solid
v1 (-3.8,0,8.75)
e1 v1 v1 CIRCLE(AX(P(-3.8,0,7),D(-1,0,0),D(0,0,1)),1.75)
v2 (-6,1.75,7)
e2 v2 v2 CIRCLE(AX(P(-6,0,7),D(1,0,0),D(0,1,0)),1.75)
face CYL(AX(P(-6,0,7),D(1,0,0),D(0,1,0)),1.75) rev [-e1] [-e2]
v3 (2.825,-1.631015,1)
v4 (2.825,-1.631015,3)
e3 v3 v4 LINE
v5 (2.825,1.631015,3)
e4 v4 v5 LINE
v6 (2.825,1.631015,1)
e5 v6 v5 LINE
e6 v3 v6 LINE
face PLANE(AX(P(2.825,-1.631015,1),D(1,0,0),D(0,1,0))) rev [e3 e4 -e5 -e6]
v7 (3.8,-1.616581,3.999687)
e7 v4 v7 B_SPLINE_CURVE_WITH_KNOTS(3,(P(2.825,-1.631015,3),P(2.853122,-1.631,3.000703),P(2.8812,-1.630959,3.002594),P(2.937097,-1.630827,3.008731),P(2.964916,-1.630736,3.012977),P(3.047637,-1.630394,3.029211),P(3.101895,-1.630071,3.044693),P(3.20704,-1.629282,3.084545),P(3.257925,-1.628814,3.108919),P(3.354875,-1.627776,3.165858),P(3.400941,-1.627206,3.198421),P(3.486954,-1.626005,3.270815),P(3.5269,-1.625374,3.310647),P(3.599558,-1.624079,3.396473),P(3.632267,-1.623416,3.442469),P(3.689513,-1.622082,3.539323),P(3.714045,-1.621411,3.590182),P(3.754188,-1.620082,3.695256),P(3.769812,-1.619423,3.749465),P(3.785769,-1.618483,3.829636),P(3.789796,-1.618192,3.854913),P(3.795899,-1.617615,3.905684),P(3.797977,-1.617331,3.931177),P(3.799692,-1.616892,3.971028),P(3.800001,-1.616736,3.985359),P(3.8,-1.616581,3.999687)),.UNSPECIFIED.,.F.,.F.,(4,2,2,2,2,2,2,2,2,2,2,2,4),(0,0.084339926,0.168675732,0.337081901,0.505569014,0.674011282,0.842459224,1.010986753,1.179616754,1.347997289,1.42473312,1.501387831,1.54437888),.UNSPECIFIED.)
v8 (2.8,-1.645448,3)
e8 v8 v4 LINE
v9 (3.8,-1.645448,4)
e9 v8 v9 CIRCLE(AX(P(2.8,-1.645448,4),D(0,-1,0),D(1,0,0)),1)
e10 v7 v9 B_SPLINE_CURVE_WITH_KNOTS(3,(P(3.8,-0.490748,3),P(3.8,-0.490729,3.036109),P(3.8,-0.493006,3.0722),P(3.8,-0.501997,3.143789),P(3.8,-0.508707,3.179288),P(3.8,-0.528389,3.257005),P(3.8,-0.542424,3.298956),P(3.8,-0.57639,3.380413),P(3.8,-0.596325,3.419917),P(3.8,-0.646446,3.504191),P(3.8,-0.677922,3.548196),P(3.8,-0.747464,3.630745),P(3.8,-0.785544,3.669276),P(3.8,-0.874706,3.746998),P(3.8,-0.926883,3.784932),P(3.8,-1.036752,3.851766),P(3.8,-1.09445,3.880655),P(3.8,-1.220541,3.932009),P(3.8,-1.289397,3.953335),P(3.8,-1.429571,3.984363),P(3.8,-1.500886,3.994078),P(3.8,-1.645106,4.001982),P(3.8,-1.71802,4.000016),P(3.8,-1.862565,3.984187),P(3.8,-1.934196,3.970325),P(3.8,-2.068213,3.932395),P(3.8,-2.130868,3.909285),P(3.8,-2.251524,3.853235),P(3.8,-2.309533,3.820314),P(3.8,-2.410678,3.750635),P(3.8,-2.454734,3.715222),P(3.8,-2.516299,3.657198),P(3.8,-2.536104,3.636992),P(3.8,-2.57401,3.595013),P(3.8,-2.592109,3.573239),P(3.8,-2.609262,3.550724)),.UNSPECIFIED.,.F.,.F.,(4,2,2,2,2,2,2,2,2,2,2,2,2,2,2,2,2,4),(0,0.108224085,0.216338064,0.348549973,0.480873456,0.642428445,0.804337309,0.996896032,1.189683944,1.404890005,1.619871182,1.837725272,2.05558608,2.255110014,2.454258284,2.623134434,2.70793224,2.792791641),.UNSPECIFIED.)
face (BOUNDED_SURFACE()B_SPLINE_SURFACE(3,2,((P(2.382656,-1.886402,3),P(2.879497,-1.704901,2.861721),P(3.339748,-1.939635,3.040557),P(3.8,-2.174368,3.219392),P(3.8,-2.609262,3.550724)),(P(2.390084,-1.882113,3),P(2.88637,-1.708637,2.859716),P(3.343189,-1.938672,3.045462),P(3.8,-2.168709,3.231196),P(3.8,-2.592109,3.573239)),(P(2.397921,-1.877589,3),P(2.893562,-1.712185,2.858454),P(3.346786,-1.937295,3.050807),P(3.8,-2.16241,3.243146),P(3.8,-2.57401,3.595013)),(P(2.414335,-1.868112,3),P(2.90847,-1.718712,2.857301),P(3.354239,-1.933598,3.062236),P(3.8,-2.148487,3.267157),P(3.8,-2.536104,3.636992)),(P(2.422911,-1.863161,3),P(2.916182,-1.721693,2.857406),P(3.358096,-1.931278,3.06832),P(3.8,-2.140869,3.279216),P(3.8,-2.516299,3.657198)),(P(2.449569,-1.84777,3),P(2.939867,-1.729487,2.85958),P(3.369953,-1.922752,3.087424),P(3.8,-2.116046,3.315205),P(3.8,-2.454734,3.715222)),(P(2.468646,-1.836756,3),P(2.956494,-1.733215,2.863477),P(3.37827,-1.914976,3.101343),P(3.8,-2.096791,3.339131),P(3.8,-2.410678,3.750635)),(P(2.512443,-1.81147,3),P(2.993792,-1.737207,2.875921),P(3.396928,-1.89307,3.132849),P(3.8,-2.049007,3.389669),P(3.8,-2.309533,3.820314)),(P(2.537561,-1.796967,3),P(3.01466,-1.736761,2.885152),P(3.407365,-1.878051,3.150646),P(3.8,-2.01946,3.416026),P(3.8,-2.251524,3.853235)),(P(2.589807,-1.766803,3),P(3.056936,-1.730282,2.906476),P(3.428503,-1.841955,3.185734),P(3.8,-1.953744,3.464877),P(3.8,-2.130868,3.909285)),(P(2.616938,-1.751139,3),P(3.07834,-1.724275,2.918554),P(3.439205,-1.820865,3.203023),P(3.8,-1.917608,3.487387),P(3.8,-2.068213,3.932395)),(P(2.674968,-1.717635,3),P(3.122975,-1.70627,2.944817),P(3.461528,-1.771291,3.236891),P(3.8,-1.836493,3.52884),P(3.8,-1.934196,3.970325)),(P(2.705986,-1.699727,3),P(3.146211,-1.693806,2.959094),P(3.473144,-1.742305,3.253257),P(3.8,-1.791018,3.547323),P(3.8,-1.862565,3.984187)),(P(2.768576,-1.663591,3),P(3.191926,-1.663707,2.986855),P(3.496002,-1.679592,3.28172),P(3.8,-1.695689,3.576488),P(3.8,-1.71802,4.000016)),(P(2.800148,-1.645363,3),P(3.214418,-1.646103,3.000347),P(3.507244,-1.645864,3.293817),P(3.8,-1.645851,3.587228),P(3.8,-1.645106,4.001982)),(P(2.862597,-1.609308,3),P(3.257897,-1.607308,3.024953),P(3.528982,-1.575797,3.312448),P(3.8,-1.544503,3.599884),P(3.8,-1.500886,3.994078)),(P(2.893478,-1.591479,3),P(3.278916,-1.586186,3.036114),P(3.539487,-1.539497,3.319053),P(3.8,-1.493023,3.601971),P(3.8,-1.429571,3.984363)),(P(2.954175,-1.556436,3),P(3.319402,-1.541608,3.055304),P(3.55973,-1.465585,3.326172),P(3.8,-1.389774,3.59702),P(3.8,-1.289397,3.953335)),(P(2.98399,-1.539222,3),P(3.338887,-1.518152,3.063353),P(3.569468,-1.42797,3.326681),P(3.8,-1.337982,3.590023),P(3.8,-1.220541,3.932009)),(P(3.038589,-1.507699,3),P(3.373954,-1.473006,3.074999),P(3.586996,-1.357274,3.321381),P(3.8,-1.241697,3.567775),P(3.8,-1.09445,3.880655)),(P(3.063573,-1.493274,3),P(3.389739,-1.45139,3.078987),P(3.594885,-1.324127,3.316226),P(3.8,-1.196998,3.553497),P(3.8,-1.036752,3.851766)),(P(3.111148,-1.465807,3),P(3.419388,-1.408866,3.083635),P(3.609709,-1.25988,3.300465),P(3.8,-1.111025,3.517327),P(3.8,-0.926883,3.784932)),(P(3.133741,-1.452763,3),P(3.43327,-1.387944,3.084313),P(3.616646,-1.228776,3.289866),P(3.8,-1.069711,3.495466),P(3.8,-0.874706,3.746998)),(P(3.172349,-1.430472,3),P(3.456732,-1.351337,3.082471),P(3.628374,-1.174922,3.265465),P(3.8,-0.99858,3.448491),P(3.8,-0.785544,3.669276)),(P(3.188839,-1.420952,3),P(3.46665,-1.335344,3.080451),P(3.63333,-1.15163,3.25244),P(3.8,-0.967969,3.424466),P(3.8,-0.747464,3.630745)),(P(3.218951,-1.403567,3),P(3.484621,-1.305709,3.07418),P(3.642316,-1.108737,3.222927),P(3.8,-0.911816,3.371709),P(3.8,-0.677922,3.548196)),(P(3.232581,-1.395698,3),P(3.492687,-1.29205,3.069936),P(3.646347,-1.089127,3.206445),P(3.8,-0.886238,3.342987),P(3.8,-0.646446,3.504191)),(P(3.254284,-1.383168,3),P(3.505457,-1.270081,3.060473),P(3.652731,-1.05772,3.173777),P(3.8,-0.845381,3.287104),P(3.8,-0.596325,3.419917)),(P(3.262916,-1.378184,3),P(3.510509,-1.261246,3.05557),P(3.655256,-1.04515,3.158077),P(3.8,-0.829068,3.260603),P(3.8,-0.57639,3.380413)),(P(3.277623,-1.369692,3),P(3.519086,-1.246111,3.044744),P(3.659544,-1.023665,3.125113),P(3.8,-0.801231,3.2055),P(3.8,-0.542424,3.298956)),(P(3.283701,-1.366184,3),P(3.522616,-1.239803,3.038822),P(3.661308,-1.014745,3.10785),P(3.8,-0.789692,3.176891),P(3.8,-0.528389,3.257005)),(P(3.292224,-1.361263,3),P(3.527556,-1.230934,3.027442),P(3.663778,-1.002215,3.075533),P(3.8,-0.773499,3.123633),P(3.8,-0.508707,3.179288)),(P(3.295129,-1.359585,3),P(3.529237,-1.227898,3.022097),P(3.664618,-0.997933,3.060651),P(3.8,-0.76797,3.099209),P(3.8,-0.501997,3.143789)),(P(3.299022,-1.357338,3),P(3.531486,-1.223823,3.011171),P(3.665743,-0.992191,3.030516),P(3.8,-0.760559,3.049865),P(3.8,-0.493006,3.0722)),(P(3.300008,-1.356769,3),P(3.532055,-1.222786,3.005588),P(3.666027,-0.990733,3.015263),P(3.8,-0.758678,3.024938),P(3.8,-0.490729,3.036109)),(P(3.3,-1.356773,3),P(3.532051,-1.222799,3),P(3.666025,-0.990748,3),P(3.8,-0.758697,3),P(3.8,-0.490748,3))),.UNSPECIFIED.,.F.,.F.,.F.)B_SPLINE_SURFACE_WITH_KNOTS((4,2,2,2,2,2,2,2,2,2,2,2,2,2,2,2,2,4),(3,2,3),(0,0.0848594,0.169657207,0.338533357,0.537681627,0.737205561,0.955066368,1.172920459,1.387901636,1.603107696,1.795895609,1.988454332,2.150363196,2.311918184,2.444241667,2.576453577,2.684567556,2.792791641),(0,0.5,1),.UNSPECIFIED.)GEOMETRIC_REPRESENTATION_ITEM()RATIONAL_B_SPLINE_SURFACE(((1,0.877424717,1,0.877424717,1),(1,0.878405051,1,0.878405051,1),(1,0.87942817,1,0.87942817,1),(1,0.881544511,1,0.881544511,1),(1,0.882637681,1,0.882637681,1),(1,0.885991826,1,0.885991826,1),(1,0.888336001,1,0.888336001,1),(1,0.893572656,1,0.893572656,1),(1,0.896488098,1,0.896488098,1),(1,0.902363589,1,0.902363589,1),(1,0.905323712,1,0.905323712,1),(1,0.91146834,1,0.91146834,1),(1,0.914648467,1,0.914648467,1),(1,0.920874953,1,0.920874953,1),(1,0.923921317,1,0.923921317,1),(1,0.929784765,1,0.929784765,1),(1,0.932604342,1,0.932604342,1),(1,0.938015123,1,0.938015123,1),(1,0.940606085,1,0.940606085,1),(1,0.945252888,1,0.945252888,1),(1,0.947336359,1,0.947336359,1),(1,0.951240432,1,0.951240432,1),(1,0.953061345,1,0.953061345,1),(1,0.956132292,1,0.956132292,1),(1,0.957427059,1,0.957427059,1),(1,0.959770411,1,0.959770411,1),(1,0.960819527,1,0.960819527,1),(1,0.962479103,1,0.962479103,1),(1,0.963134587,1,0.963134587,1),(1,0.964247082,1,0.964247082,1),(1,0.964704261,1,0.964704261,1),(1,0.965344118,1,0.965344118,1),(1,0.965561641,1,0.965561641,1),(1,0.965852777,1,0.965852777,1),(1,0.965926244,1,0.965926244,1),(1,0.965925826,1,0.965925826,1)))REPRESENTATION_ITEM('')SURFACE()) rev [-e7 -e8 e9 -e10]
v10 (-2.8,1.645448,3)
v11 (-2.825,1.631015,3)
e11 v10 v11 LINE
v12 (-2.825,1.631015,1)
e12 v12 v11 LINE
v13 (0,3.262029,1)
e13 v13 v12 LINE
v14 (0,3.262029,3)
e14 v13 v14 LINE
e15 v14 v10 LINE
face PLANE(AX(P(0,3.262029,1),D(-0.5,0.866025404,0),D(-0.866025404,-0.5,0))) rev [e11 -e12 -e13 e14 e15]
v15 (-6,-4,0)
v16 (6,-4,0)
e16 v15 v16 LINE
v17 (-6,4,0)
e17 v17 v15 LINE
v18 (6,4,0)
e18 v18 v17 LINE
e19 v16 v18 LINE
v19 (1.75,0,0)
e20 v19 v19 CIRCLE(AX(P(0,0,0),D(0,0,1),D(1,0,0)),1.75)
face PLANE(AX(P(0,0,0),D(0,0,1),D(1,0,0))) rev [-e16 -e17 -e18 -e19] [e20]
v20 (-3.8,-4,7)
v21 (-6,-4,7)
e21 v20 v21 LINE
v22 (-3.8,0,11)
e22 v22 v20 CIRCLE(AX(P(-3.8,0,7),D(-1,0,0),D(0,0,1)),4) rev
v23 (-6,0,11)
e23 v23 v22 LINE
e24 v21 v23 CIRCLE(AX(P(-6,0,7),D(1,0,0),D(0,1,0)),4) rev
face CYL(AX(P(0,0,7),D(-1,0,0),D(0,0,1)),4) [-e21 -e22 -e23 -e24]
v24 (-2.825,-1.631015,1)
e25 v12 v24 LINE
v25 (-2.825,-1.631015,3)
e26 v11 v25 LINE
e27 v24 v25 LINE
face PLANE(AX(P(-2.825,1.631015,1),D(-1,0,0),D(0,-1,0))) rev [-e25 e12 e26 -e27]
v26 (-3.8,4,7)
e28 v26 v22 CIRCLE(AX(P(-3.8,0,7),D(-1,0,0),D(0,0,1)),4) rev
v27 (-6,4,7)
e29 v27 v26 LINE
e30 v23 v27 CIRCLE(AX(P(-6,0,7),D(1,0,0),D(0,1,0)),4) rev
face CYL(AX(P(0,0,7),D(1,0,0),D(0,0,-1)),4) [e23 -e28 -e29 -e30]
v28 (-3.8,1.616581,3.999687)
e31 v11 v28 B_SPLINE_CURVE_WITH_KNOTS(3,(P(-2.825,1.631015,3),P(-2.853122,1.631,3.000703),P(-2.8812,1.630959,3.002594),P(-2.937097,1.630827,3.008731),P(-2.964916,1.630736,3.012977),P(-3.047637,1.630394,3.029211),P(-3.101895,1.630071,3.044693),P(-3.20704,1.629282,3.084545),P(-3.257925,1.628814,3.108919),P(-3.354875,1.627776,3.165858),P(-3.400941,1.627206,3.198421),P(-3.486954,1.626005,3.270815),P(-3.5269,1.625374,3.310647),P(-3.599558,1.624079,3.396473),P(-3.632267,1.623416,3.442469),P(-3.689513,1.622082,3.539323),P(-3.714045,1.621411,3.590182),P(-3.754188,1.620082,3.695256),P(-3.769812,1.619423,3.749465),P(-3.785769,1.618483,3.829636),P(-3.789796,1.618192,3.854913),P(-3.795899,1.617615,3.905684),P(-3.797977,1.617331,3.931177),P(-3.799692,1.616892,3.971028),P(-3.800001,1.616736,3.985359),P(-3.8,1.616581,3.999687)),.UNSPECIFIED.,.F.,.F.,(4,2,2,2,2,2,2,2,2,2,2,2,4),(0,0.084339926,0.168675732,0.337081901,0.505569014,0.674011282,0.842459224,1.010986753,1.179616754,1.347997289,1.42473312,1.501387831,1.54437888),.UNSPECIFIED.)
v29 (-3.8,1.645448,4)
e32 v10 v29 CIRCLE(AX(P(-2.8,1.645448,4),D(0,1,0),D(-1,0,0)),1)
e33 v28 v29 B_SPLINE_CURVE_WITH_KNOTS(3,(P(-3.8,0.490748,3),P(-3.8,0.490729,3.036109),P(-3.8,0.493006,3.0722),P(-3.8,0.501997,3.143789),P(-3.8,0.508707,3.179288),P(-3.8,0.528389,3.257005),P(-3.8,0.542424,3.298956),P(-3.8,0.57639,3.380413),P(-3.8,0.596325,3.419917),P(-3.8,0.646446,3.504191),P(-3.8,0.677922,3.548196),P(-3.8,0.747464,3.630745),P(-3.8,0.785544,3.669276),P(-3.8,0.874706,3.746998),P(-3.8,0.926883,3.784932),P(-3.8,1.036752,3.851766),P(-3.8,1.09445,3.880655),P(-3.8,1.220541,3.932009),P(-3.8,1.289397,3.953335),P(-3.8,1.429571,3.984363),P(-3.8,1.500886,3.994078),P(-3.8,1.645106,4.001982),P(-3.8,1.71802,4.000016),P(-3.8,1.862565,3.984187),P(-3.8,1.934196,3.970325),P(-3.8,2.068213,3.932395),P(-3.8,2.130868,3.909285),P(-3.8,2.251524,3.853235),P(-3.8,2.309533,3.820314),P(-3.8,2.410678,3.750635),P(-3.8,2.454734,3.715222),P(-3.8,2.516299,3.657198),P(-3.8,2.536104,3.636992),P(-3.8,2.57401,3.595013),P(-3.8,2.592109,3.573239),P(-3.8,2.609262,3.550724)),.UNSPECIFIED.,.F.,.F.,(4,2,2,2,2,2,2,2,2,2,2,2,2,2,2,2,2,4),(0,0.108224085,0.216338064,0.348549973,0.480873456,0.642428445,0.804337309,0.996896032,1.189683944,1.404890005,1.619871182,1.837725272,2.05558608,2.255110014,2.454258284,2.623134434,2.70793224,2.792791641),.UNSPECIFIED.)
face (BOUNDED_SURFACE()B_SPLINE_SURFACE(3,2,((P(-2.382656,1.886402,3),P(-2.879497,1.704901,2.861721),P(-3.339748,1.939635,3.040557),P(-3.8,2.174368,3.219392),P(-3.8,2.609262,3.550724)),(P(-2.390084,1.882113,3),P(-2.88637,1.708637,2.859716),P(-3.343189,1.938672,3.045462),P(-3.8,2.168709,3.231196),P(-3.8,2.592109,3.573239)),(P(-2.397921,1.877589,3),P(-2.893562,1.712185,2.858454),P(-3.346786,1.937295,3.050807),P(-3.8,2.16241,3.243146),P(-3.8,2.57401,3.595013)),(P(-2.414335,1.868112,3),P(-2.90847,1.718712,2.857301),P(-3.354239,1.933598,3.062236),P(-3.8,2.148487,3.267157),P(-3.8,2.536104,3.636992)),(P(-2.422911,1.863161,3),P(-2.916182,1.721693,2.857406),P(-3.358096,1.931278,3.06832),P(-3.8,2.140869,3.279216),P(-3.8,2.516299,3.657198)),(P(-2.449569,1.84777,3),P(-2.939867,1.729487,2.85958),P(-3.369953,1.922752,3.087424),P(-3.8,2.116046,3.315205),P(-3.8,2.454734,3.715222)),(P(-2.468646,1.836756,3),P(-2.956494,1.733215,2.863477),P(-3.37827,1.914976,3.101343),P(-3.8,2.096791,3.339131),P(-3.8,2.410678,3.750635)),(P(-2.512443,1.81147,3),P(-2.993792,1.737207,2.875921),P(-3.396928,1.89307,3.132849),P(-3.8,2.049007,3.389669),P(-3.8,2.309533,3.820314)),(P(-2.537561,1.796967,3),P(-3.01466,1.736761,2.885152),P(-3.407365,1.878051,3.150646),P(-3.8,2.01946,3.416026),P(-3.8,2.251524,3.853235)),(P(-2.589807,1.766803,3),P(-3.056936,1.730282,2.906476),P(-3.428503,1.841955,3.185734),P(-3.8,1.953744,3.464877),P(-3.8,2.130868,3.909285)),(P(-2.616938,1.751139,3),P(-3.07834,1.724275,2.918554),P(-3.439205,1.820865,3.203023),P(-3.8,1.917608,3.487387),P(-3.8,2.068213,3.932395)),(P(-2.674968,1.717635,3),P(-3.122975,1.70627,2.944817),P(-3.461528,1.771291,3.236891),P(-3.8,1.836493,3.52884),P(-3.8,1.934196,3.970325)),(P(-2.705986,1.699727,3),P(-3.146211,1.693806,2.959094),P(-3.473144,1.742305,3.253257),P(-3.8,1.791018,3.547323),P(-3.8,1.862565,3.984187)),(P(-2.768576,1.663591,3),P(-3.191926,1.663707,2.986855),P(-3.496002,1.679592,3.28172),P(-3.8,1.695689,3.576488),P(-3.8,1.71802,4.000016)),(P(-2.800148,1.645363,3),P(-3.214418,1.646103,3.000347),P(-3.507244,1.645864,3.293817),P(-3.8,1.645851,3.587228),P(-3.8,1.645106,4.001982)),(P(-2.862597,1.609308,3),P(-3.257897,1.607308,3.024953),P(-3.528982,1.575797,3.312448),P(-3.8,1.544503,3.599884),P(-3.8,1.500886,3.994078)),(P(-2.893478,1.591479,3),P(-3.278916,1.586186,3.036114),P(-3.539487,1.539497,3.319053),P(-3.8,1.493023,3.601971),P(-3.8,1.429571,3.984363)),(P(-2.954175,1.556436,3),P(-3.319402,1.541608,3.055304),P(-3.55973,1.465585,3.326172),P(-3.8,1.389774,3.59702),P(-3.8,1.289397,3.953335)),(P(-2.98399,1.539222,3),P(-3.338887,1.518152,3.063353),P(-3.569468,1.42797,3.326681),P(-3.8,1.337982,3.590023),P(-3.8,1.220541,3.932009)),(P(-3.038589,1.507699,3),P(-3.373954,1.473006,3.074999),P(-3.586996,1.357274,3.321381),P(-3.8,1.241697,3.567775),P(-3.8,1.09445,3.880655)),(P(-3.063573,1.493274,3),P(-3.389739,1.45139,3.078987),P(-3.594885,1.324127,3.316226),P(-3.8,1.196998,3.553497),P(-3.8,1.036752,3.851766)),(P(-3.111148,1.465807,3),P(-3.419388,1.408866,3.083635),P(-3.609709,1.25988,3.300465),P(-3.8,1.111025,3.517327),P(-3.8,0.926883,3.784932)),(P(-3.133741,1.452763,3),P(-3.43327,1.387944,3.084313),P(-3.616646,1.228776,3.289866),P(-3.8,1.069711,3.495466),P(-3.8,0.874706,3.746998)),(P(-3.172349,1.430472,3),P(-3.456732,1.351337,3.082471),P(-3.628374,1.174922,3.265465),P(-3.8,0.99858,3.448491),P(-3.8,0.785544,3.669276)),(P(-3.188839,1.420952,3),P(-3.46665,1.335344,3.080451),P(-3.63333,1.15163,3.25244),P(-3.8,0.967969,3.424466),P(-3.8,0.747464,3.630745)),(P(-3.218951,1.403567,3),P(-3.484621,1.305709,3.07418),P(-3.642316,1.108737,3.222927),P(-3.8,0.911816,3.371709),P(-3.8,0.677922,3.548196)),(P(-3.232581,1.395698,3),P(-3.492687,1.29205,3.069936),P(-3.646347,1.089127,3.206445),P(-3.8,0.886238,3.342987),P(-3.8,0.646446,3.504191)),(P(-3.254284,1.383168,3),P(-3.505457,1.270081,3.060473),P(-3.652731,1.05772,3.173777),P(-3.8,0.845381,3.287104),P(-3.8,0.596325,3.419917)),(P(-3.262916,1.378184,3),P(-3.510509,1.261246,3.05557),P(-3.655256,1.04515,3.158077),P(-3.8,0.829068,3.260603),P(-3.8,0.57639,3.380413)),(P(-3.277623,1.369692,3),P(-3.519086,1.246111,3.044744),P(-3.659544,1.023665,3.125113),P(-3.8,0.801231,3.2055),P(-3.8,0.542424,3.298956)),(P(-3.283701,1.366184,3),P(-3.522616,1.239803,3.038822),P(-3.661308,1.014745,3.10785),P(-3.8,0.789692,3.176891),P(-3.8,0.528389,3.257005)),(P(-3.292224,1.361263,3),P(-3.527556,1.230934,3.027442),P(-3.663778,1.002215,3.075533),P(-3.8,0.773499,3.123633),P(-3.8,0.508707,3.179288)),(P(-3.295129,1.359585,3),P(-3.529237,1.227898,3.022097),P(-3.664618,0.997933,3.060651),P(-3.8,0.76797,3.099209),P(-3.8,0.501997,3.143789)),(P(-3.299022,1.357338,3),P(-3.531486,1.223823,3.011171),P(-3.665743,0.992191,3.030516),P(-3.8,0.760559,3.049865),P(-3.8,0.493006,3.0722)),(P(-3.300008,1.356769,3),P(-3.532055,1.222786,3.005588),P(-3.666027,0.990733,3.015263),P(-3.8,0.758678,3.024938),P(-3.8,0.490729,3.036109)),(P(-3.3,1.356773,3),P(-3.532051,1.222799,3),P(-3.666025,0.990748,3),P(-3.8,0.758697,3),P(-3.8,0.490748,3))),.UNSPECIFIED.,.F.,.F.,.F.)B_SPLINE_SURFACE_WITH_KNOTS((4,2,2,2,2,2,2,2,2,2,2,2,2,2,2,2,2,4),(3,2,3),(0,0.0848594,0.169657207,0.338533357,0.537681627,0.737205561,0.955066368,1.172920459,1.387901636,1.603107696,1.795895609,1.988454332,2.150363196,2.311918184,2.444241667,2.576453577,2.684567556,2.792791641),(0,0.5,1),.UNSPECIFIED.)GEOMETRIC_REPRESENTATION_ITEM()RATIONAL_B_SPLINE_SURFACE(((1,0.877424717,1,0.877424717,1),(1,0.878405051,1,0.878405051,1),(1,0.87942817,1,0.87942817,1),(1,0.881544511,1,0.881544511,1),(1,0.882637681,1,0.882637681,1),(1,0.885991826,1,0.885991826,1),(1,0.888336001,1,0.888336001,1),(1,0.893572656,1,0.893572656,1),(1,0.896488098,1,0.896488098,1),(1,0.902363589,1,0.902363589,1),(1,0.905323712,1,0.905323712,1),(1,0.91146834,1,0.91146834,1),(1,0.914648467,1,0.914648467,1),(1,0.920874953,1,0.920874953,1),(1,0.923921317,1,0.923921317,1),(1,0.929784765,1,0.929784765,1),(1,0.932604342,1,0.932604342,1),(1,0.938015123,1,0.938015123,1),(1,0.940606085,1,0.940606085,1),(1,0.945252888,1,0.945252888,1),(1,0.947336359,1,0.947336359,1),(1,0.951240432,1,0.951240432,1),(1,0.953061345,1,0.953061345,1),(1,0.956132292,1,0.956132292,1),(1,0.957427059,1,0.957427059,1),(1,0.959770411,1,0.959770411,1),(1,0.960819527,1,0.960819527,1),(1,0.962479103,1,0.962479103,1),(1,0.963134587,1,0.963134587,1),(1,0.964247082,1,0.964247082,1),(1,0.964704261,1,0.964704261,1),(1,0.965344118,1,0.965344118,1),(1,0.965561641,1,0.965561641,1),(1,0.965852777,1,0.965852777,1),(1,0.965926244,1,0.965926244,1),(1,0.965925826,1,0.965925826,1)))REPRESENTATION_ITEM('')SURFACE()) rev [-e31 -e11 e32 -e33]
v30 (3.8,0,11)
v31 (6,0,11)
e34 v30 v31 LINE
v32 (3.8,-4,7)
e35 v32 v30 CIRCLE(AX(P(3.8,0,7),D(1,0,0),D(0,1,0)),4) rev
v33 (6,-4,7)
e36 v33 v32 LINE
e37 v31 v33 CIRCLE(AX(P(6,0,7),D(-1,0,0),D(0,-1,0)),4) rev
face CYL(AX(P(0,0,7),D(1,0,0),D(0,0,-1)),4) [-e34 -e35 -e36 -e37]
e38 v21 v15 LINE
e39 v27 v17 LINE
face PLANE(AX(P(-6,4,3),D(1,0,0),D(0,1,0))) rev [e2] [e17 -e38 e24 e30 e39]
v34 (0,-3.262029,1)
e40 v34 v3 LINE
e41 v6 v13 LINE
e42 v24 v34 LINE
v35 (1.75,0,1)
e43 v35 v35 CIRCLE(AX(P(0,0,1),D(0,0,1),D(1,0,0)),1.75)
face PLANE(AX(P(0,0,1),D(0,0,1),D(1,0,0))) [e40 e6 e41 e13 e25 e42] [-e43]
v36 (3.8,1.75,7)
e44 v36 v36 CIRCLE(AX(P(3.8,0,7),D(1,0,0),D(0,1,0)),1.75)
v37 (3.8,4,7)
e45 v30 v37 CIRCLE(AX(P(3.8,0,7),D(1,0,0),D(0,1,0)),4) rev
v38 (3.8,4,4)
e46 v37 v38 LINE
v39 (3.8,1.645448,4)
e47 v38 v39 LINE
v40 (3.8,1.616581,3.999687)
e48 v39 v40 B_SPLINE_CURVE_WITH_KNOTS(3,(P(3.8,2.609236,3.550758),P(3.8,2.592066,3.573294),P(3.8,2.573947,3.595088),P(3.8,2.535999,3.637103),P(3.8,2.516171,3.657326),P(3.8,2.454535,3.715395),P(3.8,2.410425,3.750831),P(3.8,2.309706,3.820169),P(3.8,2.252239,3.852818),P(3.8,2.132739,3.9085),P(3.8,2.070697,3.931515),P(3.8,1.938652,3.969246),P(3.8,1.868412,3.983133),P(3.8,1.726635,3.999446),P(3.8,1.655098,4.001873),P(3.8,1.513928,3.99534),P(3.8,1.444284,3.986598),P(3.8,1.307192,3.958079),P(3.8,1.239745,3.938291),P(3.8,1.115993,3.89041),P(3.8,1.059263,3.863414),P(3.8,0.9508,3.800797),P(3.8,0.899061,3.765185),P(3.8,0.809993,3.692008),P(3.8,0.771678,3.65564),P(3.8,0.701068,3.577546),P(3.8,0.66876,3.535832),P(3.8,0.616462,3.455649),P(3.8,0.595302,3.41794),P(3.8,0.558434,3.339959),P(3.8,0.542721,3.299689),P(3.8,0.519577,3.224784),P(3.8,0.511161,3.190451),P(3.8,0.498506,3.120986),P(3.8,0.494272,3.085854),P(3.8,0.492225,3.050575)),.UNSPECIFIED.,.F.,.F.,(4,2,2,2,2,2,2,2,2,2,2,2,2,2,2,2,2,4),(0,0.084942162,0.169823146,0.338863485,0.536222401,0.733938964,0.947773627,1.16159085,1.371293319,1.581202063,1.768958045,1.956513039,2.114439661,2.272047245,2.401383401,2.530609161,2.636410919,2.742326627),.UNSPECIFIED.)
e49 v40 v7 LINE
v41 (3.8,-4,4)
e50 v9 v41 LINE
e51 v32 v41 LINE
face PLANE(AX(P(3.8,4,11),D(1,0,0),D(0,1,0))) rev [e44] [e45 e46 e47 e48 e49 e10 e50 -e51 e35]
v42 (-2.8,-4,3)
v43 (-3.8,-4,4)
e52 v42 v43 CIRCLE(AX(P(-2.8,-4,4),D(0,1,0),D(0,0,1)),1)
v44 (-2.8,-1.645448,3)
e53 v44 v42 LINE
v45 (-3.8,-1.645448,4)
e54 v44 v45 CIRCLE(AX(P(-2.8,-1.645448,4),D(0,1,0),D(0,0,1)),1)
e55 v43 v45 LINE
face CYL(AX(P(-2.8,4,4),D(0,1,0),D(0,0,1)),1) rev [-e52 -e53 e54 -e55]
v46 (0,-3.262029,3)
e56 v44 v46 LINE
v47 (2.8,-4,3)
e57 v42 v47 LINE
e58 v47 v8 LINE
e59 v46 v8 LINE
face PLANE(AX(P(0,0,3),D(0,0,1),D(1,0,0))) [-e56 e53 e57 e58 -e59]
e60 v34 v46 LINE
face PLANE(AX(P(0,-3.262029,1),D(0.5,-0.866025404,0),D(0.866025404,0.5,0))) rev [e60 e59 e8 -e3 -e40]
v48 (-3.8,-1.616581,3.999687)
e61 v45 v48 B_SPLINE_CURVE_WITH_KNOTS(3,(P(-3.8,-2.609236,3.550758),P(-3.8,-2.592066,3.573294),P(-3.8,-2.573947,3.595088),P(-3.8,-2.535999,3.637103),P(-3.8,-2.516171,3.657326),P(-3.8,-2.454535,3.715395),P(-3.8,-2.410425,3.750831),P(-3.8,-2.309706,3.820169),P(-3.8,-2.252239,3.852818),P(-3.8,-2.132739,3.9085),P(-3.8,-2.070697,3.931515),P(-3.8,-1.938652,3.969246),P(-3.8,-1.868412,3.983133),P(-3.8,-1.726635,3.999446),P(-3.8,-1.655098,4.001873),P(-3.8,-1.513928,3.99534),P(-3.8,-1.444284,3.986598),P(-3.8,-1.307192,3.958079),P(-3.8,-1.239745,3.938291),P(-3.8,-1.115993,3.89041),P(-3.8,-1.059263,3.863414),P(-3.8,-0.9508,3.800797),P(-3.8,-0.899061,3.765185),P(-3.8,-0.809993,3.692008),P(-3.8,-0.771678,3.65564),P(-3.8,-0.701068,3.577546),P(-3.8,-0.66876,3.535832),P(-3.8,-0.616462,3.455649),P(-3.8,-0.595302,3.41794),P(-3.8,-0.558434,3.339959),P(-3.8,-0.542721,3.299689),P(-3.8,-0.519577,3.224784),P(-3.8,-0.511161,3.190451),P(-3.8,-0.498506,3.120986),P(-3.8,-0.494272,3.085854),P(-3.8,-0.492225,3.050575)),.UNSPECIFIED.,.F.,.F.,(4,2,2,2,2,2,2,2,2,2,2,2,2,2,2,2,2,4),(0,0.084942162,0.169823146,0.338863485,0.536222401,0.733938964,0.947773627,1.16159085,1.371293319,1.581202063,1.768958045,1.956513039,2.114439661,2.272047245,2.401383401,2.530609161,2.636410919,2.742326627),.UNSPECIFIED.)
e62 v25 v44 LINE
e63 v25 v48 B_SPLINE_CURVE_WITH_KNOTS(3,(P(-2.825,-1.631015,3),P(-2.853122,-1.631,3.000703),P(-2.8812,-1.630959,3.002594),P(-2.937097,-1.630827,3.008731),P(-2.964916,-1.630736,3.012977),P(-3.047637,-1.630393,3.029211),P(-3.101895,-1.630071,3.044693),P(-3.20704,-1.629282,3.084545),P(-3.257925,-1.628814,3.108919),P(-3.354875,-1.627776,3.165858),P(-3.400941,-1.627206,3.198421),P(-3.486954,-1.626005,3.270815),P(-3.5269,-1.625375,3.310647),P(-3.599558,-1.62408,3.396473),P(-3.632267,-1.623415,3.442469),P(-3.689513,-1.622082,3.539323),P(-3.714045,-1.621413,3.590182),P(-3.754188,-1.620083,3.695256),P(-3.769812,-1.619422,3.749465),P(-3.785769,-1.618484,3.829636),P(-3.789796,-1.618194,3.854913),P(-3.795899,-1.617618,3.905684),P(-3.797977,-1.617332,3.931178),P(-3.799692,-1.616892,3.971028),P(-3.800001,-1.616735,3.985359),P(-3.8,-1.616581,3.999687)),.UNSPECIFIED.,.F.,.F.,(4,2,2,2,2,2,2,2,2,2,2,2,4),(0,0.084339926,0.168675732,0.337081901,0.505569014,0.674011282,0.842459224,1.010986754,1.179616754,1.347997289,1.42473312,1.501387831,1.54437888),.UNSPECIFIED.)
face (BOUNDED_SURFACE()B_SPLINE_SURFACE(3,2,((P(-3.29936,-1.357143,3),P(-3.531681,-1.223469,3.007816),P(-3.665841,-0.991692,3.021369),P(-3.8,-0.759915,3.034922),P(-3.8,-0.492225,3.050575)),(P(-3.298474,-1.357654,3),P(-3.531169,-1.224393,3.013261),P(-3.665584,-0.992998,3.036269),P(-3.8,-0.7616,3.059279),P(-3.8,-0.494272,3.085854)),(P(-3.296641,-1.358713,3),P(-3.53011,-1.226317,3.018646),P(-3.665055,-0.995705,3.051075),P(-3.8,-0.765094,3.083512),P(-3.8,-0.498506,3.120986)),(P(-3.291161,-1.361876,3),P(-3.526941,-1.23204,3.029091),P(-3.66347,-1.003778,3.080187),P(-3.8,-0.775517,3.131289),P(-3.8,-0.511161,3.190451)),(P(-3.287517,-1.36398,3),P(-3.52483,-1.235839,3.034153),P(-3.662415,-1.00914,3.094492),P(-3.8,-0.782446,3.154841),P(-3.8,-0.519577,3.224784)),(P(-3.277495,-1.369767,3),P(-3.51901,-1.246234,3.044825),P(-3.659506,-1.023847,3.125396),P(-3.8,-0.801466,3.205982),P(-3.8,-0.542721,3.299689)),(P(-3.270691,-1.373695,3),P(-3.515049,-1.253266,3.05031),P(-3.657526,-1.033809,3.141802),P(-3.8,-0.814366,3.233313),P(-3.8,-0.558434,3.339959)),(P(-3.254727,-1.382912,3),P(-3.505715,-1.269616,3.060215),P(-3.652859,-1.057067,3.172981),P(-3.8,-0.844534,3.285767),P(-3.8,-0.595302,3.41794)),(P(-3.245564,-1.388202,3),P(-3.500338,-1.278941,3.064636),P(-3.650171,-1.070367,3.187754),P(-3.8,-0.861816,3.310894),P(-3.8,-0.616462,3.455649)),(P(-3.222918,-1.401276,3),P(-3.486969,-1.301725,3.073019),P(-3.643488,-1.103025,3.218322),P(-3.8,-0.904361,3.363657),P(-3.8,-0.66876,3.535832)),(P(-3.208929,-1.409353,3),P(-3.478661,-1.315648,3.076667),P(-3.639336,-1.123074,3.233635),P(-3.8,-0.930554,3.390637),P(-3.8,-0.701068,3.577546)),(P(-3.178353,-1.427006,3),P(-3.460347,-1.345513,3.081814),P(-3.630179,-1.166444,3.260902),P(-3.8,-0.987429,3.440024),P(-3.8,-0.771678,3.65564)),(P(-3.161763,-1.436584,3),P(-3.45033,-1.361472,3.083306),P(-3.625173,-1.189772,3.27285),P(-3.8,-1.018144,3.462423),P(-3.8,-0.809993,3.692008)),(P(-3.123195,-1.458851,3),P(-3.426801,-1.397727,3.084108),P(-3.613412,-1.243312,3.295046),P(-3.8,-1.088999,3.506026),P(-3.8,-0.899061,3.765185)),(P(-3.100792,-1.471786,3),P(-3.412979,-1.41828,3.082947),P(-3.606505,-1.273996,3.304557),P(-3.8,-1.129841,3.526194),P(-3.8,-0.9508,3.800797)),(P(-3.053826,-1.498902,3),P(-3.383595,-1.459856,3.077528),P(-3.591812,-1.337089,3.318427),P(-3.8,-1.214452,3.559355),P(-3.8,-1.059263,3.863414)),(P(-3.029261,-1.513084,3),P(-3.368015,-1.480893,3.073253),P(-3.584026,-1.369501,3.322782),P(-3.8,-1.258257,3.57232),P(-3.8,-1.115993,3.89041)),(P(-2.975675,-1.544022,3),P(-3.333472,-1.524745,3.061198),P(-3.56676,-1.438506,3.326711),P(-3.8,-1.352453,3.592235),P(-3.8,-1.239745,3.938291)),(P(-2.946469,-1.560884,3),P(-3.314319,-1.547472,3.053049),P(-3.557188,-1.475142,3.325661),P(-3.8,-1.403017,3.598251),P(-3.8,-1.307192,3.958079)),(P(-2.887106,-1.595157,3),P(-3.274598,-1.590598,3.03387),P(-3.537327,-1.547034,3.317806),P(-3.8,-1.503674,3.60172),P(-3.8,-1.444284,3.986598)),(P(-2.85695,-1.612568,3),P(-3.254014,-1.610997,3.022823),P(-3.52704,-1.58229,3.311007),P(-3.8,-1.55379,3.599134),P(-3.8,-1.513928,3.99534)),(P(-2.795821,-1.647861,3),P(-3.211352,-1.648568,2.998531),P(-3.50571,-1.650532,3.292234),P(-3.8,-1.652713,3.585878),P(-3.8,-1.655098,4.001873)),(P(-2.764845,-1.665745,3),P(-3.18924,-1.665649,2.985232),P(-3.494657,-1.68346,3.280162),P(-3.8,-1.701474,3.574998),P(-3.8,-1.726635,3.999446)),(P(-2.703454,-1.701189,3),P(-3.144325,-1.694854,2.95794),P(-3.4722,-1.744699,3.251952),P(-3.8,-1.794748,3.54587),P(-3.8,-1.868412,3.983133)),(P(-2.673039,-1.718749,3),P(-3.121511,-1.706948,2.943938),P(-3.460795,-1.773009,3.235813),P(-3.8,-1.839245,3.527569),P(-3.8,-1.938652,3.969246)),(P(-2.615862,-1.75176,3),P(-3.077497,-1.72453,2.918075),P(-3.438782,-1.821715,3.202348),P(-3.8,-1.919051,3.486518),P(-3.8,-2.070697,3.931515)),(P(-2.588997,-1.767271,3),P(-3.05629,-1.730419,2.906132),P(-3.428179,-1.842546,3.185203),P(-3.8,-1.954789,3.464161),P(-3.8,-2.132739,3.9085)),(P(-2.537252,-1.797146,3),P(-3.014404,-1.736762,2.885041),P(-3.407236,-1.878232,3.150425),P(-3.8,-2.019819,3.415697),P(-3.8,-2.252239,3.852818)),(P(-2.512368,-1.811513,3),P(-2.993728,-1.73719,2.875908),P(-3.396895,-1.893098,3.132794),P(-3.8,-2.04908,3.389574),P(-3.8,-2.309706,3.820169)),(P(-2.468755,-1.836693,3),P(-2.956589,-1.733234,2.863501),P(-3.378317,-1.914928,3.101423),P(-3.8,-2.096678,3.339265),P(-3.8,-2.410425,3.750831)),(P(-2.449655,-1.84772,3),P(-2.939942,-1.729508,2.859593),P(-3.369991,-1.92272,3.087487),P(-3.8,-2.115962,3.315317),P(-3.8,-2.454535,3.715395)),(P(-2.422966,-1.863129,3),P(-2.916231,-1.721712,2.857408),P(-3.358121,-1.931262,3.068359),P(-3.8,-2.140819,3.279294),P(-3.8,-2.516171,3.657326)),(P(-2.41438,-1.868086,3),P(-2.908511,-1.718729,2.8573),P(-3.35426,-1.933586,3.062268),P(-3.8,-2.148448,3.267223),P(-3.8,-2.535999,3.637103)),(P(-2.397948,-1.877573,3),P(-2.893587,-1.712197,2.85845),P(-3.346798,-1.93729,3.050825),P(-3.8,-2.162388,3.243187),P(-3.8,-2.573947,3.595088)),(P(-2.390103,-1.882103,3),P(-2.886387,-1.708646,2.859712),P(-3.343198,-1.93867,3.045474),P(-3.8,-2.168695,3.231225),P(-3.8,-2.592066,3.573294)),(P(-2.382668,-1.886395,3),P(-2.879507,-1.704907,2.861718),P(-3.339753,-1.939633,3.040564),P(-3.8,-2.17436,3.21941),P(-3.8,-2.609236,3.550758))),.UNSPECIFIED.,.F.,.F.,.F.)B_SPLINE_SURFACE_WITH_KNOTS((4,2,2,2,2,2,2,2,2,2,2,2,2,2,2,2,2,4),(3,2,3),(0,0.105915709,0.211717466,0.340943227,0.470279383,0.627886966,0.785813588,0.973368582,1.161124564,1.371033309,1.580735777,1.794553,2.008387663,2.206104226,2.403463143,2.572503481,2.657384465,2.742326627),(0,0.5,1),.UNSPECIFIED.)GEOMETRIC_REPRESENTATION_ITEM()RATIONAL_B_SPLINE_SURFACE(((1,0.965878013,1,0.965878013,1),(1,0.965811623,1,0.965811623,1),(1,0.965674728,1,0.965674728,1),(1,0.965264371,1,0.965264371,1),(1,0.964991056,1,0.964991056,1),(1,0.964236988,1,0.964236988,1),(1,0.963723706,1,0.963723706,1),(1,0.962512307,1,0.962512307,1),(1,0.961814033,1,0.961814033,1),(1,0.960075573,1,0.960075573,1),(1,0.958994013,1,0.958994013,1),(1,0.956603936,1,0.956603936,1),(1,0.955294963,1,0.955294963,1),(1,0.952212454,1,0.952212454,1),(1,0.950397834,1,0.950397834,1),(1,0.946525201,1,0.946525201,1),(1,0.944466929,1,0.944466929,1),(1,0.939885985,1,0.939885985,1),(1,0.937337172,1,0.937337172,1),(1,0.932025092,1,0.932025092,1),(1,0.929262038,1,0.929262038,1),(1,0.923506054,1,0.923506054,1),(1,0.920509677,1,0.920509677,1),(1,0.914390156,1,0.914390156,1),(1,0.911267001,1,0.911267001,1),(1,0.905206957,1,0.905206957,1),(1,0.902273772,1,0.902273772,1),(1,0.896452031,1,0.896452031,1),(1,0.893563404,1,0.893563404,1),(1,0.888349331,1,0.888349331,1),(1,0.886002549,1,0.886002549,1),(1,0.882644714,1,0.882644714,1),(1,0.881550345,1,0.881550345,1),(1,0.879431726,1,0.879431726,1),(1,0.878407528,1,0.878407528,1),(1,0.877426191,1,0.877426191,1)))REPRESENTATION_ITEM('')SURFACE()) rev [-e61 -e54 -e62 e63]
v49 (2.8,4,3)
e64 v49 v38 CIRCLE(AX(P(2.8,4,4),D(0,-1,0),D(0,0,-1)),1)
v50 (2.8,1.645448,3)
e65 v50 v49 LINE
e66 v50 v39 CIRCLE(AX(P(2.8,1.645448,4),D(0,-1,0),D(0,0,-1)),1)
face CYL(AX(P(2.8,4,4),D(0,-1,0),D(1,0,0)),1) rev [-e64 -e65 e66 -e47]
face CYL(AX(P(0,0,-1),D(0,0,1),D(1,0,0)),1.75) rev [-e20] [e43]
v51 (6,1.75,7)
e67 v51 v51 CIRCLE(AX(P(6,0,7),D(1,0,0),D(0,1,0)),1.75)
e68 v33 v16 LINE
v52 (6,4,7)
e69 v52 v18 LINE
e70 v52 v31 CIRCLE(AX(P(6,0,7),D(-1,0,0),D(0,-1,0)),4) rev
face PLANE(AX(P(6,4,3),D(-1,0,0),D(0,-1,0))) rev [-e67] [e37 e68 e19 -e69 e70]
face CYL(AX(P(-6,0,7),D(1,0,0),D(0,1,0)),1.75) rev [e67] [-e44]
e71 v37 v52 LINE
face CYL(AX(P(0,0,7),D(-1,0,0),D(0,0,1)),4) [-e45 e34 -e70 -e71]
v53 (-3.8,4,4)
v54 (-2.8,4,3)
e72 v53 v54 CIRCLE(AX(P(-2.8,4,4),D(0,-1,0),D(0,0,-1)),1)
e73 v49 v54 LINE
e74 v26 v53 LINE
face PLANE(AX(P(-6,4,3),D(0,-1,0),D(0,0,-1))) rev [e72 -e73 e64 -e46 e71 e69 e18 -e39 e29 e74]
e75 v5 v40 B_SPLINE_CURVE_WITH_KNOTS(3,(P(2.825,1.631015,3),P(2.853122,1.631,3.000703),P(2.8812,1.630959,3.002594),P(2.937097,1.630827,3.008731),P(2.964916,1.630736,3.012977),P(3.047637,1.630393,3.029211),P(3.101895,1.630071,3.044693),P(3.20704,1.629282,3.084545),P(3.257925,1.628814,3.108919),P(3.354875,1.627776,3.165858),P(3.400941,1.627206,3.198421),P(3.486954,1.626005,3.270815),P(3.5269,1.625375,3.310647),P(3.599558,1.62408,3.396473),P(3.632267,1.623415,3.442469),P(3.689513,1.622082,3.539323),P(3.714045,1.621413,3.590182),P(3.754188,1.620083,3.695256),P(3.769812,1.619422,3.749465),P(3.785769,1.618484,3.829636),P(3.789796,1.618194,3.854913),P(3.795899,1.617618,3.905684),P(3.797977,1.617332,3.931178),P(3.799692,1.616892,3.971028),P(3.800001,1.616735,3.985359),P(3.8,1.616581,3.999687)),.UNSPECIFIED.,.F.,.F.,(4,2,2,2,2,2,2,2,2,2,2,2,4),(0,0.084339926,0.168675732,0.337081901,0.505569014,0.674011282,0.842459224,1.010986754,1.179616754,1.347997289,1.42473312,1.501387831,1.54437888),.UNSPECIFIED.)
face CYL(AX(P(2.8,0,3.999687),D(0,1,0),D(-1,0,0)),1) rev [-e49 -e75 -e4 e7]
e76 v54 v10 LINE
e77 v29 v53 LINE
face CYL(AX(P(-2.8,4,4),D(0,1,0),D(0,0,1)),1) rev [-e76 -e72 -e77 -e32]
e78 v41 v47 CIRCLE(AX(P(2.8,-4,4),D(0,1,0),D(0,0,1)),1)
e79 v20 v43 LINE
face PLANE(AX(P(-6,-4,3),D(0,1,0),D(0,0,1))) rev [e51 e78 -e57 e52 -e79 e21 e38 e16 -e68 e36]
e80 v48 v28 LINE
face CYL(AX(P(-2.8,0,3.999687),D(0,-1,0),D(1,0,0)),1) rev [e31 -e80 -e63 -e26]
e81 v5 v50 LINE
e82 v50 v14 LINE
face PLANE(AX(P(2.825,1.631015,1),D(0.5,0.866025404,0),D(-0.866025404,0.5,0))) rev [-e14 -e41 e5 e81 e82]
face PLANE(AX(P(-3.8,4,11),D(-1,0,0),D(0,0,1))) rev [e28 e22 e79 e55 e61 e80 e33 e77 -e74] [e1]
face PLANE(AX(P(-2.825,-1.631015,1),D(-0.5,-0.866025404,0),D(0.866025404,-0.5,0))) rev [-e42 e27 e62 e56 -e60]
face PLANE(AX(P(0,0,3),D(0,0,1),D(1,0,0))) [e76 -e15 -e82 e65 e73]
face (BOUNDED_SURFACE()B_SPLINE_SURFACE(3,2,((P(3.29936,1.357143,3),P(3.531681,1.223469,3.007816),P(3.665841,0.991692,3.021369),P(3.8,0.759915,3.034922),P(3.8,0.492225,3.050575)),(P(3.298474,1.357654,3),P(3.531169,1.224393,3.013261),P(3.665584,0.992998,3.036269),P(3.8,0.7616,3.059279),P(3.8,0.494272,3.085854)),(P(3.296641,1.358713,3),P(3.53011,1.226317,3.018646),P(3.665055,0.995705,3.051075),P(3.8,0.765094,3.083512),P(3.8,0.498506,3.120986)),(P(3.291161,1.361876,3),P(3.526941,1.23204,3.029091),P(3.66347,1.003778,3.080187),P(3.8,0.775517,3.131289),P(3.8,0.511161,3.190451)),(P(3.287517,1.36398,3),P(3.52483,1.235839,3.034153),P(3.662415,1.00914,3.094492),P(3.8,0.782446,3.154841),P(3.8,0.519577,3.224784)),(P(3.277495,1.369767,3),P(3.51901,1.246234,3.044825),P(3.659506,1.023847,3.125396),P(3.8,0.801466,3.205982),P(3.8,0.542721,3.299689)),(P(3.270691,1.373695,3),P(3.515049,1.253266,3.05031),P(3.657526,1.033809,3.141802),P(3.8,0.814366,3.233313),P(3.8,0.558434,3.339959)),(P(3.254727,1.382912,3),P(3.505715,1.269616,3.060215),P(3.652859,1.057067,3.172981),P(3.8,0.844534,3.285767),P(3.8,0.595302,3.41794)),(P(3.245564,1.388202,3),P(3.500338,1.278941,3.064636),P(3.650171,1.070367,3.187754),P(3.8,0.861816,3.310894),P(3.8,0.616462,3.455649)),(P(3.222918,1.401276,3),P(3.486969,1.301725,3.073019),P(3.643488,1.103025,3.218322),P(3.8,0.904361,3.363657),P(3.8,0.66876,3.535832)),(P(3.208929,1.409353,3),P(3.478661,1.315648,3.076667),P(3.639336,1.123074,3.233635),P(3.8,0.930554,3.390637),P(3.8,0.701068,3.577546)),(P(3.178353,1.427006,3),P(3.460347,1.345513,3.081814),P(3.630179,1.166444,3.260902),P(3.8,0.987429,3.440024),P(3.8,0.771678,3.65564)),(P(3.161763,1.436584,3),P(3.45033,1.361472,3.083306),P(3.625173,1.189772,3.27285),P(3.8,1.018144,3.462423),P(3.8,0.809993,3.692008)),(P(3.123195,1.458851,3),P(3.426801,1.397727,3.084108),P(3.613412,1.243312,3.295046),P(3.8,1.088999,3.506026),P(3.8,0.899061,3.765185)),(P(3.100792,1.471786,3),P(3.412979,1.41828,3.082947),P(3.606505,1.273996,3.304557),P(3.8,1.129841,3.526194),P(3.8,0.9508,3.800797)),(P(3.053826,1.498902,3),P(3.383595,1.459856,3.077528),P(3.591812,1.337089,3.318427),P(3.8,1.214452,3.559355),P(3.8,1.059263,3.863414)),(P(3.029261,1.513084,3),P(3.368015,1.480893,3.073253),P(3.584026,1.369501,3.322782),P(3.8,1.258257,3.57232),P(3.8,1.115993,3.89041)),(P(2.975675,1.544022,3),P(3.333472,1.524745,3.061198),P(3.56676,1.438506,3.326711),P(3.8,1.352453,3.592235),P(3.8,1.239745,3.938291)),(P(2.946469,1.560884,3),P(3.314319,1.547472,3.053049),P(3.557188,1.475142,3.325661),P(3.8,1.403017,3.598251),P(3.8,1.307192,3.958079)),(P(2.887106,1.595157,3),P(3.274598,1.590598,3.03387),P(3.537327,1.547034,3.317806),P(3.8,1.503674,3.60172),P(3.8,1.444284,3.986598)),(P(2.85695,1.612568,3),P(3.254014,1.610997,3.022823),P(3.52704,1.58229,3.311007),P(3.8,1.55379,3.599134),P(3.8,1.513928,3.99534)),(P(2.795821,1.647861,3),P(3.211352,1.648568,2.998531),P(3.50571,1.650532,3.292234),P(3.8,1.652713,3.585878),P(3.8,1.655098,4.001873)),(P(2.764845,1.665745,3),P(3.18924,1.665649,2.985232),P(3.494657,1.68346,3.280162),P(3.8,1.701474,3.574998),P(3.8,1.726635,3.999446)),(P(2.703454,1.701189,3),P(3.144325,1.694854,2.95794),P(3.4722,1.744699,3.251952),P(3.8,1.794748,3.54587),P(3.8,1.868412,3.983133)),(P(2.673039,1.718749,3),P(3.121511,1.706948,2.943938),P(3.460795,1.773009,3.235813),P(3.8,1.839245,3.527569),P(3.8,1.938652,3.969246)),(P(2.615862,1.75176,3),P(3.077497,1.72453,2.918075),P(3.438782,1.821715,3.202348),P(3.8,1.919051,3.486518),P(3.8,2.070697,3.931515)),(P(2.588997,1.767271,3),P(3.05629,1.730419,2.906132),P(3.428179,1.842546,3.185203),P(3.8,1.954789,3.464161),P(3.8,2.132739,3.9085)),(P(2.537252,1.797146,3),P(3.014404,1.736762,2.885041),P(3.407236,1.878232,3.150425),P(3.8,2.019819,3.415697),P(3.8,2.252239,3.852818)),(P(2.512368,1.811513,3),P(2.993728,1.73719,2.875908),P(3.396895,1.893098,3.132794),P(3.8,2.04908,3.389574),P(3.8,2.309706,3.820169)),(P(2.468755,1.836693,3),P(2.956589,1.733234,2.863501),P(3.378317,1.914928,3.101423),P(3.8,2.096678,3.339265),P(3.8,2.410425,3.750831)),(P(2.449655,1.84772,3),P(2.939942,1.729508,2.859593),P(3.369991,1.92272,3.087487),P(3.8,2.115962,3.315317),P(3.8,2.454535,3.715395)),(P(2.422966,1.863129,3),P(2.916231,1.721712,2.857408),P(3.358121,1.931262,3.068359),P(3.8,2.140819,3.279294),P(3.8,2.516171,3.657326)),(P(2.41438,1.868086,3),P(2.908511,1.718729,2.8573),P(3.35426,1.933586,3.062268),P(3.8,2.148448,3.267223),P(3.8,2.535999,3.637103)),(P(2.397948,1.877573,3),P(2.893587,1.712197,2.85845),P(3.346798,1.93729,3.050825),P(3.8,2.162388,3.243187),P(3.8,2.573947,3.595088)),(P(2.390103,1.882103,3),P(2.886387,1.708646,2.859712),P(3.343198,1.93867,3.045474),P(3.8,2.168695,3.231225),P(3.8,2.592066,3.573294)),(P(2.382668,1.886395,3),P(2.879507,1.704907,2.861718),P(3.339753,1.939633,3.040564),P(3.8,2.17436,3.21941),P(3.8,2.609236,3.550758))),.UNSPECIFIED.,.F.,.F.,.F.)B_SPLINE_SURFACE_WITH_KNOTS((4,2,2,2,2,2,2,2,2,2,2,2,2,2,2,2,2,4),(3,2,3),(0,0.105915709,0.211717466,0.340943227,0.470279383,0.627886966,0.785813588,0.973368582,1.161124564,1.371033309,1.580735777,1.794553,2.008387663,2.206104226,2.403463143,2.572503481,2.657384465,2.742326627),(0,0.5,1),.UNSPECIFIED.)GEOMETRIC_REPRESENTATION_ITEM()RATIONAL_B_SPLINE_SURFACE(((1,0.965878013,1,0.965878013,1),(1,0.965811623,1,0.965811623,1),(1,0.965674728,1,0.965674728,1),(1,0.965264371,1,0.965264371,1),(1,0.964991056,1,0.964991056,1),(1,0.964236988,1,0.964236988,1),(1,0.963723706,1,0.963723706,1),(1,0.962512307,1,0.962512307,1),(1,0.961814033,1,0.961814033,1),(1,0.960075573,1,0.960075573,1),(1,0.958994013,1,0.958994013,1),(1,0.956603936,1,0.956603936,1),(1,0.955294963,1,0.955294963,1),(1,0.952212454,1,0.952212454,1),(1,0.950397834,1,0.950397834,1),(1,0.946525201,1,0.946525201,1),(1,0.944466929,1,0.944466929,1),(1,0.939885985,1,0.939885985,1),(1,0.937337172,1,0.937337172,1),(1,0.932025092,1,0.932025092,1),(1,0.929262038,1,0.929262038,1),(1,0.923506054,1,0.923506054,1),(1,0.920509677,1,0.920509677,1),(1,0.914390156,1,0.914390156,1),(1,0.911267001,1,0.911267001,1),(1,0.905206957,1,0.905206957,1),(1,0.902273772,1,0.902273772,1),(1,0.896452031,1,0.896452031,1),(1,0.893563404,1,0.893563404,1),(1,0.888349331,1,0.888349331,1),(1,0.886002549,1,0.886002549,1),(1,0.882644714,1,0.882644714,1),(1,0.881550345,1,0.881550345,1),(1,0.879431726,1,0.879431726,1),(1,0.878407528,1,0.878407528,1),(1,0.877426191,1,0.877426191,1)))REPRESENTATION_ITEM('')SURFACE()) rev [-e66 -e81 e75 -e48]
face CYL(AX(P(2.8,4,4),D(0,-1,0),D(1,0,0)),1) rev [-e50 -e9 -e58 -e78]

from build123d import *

# Parameters (mm, degrees)
SKETCH_1_W          = 12
SKETCH_1_H          = 8
EXTRUDE_1_DEPTH     = 3
CUT_EXTRUDE_1_DEPTH = 2
SKETCH_3_R          = 1.75
CUT_EXTRUDE_2_DEPTH = 2
SKETCH_4_W          = 2.2
SKETCH_4_H          = 8
EXTRUDE_2_DEPTH     = 8
FILLET_1_R          = 4
SKETCH_5_R          = 1.75
CUT_EXTRUDE_3_DEPTH = 17.763054614
FILLET_2_R          = 1


with BuildPart() as part:
    # Эскиз1 → Бобышка-Вытянуть1 (new body)
    with BuildSketch(Plane.XY):
        Rectangle(SKETCH_1_W, SKETCH_1_H)
    extrude(amount=EXTRUDE_1_DEPTH)

    # Эскиз2 → Вырез-Вытянуть1 (cut)
    with BuildSketch(Plane.XY.offset(3)):
        Polygon((2.825, -1.63101451), (2.825, 1.63101451), (0, 3.262029021), (-2.825, 1.63101451), (-2.825, -1.63101451), (0, -3.262029021), align=None)
    extrude(amount=-CUT_EXTRUDE_1_DEPTH, mode=Mode.SUBTRACT)

    # Эскиз3 → Вырез-Вытянуть2 (cut)
    with BuildSketch(Plane.XY.offset(1)):
        Circle(SKETCH_3_R)
    extrude(amount=-CUT_EXTRUDE_2_DEPTH, mode=Mode.SUBTRACT)

    # Эскиз4 → Бобышка-Вытянуть2 (add)
    with BuildSketch(Plane.XY.offset(3)):
        with Locations((-4.9, 0)):
            Rectangle(SKETCH_4_W, SKETCH_4_H)
        with Locations((4.9, 0)):
            Rectangle(SKETCH_4_W, SKETCH_4_H)
    extrude(amount=EXTRUDE_2_DEPTH)

    # Скругление1
    fillet_1_edges = [part.edges().sort_by_distance(p)[0] for p in [
        (4.9, 4, 11),
        (-4.9, 4, 11),
        (4.9, -4, 11),
        (-4.9, -4, 11),
    ]]
    fillet(fillet_1_edges, radius=FILLET_1_R - 0.0001)  # a hair under: the kernel refuses the full size

    # Эскиз5 → Вырез-Вытянуть3 (cut, through all)
    with BuildSketch(Plane(origin=(6, 0, 0), x_dir=(0, 0, -1), z_dir=(1, 0, 0))):
        with Locations(Location((-7, 0, 0), (0, 0, 90))):
            Circle(SKETCH_5_R)
    extrude(amount=-CUT_EXTRUDE_3_DEPTH, mode=Mode.SUBTRACT)

    # Скругление2
    fillet_2_edges = [part.edges().sort_by_distance(p)[0] for p in [
        (-3.8, 0, 3),
        (3.8, 0, 3),
    ]]
    fillet(fillet_2_edges, radius=FILLET_2_R)


solid = part.part
